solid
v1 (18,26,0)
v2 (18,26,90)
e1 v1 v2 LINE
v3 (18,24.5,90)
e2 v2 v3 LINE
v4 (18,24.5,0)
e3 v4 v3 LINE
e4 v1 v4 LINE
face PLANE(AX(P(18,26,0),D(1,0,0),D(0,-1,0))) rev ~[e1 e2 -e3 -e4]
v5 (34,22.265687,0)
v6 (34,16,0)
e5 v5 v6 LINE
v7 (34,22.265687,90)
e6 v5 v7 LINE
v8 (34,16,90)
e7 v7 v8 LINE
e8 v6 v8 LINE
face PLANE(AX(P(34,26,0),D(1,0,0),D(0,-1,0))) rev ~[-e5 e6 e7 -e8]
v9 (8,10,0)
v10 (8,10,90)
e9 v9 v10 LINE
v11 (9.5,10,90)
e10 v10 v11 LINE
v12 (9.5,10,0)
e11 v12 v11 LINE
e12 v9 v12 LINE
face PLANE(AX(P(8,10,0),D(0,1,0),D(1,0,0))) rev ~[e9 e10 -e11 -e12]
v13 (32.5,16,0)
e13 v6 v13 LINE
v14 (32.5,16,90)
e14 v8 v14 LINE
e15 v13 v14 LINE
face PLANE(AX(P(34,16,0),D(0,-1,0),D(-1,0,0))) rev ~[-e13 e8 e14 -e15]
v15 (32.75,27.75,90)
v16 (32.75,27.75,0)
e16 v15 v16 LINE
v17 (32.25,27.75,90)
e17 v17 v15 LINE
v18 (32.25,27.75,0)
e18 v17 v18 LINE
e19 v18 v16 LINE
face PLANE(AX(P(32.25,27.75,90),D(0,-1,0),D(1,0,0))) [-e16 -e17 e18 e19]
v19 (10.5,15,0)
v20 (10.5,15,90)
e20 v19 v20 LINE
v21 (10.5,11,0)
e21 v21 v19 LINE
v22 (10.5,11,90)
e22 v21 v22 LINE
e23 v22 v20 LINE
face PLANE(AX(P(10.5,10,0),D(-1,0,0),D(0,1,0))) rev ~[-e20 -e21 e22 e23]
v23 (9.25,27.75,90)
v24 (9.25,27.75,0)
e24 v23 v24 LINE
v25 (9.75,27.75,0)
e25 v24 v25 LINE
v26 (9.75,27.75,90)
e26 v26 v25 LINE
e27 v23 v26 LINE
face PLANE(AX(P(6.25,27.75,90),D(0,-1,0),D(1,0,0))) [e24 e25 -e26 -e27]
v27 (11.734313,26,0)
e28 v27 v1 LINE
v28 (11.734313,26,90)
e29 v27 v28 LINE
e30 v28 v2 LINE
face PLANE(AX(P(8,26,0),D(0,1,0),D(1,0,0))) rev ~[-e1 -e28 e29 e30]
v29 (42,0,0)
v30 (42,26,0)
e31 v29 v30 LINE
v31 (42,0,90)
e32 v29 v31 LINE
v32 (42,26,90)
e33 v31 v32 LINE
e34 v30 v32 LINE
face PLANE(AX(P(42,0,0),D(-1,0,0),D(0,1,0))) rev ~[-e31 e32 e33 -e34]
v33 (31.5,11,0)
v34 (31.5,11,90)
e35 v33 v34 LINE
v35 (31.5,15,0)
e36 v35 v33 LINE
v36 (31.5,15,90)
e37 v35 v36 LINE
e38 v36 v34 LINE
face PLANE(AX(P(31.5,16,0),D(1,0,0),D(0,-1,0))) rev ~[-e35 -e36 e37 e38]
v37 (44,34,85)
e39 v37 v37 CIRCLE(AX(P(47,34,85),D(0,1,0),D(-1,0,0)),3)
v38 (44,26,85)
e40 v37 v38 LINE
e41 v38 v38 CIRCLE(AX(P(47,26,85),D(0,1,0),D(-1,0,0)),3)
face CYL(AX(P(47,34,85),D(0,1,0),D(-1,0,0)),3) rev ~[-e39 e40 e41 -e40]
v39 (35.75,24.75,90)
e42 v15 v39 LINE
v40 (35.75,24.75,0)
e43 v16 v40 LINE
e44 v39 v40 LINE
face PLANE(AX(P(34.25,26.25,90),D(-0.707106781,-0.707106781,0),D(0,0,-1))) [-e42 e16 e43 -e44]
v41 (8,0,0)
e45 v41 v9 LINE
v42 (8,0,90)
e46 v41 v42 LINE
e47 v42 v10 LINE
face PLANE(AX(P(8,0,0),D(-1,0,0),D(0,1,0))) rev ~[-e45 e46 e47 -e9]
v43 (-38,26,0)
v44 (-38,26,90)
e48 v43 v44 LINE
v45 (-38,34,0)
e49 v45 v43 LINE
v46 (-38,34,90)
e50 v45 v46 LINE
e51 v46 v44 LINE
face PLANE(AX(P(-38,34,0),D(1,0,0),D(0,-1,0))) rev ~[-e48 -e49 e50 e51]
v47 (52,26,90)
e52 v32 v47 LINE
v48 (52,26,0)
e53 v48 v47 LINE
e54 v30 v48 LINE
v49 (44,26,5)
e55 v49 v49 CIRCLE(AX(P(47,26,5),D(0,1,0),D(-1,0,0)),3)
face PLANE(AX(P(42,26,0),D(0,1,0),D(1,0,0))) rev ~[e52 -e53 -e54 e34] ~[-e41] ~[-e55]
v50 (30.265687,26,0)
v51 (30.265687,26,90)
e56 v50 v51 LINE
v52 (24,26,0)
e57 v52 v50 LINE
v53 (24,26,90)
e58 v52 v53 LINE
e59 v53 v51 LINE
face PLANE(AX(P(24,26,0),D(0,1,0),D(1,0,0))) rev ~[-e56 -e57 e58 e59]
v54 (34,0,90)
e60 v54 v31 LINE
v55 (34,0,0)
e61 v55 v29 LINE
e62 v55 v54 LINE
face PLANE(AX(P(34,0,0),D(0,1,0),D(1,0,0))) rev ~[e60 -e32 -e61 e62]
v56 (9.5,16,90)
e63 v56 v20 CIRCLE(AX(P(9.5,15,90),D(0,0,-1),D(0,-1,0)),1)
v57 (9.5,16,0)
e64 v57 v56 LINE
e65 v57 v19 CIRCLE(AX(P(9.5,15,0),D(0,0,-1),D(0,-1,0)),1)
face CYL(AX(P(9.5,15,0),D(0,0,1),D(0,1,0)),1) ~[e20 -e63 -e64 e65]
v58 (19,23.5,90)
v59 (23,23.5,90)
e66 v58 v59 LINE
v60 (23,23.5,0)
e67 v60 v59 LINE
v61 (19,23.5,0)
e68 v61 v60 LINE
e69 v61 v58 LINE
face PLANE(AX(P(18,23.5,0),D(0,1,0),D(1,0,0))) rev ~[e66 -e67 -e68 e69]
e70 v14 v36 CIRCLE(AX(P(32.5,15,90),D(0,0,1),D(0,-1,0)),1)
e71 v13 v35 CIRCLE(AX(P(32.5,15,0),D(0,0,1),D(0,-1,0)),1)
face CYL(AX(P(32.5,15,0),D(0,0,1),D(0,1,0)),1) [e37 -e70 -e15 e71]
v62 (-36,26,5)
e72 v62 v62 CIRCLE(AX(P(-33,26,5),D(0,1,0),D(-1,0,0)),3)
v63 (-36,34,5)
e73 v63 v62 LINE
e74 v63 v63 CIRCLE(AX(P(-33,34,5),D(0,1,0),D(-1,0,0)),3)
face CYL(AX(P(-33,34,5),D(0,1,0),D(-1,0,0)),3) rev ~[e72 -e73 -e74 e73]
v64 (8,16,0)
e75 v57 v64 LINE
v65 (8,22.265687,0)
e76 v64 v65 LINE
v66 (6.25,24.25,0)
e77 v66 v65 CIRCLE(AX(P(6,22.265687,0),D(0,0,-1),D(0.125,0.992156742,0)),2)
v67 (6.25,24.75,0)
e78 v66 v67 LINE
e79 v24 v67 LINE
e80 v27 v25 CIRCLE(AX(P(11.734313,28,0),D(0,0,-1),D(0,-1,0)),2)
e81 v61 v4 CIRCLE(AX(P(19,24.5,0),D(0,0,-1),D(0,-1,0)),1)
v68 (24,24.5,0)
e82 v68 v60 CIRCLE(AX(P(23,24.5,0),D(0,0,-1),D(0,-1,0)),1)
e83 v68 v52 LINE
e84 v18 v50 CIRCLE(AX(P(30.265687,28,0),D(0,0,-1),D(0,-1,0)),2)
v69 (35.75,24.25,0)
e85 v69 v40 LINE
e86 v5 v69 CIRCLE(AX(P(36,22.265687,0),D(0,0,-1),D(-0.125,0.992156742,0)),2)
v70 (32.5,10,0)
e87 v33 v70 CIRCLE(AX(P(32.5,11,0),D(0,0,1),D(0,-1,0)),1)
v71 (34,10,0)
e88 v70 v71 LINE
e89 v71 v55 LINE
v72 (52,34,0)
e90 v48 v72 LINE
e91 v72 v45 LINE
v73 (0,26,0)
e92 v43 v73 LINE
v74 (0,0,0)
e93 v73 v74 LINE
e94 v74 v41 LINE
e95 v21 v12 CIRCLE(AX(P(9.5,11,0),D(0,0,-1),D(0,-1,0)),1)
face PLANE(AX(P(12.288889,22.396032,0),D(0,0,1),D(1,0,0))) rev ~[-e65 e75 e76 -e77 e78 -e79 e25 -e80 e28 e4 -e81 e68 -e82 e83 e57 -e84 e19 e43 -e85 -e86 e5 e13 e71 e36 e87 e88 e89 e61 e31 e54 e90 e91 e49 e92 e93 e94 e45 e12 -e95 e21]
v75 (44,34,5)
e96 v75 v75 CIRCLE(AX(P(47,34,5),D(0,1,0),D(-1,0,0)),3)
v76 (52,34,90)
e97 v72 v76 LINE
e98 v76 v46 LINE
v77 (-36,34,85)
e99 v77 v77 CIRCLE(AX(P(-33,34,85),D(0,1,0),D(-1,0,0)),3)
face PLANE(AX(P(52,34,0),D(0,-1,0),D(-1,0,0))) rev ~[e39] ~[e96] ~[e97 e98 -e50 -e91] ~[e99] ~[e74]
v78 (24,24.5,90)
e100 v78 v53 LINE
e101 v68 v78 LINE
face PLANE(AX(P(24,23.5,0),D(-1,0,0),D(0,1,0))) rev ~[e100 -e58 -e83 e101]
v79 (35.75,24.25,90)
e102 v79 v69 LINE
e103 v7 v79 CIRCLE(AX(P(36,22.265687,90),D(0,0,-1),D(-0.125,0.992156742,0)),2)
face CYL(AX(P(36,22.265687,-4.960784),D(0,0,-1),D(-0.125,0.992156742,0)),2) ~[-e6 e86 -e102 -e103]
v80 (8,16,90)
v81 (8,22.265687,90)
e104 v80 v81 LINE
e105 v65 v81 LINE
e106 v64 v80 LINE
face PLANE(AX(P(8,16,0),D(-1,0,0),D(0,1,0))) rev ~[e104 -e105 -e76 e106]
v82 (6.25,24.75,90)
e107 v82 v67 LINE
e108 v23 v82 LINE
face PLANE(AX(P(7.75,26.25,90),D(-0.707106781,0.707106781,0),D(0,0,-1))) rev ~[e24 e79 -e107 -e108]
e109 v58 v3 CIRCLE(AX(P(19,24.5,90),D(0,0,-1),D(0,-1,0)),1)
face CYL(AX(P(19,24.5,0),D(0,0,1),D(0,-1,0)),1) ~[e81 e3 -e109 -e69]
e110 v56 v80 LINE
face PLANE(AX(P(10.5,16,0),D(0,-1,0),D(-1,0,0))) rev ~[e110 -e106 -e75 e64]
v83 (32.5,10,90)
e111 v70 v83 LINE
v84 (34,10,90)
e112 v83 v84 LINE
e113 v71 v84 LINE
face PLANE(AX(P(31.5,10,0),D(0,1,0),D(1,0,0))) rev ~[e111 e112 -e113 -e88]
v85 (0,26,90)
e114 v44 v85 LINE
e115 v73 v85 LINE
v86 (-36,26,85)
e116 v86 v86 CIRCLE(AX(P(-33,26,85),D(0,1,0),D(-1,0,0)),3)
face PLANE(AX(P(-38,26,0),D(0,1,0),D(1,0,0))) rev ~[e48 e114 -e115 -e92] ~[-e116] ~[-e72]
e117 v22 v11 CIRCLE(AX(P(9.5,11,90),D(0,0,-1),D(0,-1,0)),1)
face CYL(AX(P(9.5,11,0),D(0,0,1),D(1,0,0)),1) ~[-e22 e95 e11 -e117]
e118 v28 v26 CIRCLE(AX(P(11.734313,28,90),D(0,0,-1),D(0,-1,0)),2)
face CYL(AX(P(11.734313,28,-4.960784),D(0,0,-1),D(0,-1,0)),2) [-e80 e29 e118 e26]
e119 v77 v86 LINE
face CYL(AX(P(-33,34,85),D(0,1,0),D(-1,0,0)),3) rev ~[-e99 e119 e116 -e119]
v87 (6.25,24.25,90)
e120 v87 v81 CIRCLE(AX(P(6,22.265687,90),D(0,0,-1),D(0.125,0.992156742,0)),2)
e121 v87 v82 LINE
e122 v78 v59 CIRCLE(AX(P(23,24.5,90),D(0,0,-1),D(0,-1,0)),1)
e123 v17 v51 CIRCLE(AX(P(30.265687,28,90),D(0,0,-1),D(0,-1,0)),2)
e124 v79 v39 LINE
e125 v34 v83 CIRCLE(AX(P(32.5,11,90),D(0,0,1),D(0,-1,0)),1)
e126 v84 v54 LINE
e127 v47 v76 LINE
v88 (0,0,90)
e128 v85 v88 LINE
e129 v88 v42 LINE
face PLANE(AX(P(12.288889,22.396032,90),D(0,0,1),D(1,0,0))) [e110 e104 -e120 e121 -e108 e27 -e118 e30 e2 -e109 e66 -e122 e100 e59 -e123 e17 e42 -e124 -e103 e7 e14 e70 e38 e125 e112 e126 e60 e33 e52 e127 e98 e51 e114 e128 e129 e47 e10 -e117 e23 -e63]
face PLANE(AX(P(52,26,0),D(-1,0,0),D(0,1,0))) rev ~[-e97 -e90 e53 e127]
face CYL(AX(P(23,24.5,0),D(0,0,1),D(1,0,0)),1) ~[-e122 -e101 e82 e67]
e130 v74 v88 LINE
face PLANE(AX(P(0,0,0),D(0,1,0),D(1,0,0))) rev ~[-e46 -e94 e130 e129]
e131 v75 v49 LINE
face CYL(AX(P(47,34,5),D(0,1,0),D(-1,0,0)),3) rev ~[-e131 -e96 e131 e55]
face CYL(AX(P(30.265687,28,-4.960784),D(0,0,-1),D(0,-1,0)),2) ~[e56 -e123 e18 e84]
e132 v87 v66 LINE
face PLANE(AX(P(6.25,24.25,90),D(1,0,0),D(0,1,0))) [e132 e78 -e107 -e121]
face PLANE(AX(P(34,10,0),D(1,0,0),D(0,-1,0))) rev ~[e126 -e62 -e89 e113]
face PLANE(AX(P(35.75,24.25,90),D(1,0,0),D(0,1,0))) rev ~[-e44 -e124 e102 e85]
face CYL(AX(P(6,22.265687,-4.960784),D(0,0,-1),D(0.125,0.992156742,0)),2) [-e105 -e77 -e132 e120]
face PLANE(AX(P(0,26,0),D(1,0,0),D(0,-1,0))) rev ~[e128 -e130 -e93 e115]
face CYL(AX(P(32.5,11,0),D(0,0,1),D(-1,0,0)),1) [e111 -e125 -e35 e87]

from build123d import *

# Parameters (mm, degrees)
F1_DEPTH     = 90
F2_R         = 3
F3_DEPTH     = 25
F4_W         = 3.5
F4_H         = 3.5
F5_DEPTH     = 300
F6_SIZE      = 3
F7_SIZE      = 3
F8_R         = 1
F9_T1_DEPTH  = 99.9215674165
F10_T1_DEPTH = 99.9215674165


# Not quite as in the source:
# - a fillet or chamfer that OpenCascade refuses, or shapes differently, is made with other operations: its cross-section is extruded or revolved along the edge and cut away or added


with BuildPart() as f1:
    # F0 (on Top) → F1 (new body)
    with BuildSketch(Plane.XY):
        Polygon((0, 26), (0, 0), (8, 0), (8, 10), (10.5, 10), (10.5, 16), (8, 16), (8, 26), (18, 26), (18, 23.5), (24, 23.5), (24, 26), (34, 26), (34, 16), (31.5, 16), (31.5, 10), (34, 10), (34, 0), (42, 0), (42, 26), (52, 26), (52, 34), (-38, 34), (-38, 26), align=None)
    extrude(amount=F1_DEPTH)

    # F2 (on face) → F3 (cut)
    with BuildSketch(Plane(origin=(0, 34, 0), x_dir=(-1, 0, 0), z_dir=(0, 1, 0))):
        with Locations((33, 85)):
            Circle(F2_R)
        with Locations((33, 5)):
            Circle(F2_R)
        with Locations((-47, 5)):
            Circle(F2_R)
        with Locations((-47, 85)):
            Circle(F2_R)
    extrude(amount=-F3_DEPTH, mode=Mode.SUBTRACT)

    # F4 (on face) → F5 (cut)
    with BuildSketch(Plane.XY.offset(90)):
        with Locations((8, 26)):
            Rectangle(F4_W, F4_H)
        with Locations((34, 26)):
            Rectangle(F4_W, F4_H)
    extrude(amount=-F5_DEPTH, mode=Mode.SUBTRACT)

    # F6
    f6_edges = [f1.edges().sort_by_distance(p)[0] for p in [
        (6.25, 27.75, 45),
    ]]
    chamfer(f6_edges, length=F6_SIZE)

    # F7
    f7_edges = [f1.edges().sort_by_distance(p)[0] for p in [
        (35.75, 27.75, 45),
    ]]
    chamfer(f7_edges, length=F7_SIZE)

    # F8
    f8_edges = [f1.edges().sort_by_distance(p)[0] for p in [
        (10.5, 10, 45),
        (10.5, 16, 45),
        (18, 23.5, 45),
        (24, 23.5, 45),
        (31.5, 10, 45),
        (31.5, 16, 45),
    ]]
    fillet(f8_edges, radius=F8_R)

    # F9: fillet of radius 2 on 2 edges, made by hand

    # F9_s2 → F9_t1 (cut)
    with BuildSketch(Plane.XY.offset(-4.9607837082)):
        with BuildLine():
            ThreePointArc((35.75, 24.25), (34.5, 23.5885621722), (34, 22.2656865167))
            Line((34, 22.2656865167), (34, 24.25))
            Line((34, 24.25), (35.75, 24.25))
        make_face()
        with BuildLine():
            ThreePointArc((30.2656865167, 26), (31.5885621722, 26.5), (32.25, 27.75))
            Line((32.25, 27.75), (32.25, 26))
            Line((32.25, 26), (30.2656865167, 26))
        make_face()
    extrude(amount=F9_T1_DEPTH, mode=Mode.SUBTRACT)

    # F10: fillet of radius 2 on 2 edges, made by hand

    # F10_s2 → F10_t1 (cut)
    with BuildSketch(Plane.XY.offset(-4.9607837082)):
        with BuildLine():
            ThreePointArc((11.7343134833, 26), (10.4114378278, 26.5), (9.75, 27.75))
            Line((9.75, 27.75), (9.75, 26))
            Line((9.75, 26), (11.7343134833, 26))
        make_face()
        with BuildLine():
            ThreePointArc((6.25, 24.25), (7.5, 23.5885621722), (8, 22.2656865167))
            Line((8, 22.2656865167), (8, 24.25))
            Line((8, 24.25), (6.25, 24.25))
        make_face()
    extrude(amount=F10_T1_DEPTH, mode=Mode.SUBTRACT)


solid = f1.part
